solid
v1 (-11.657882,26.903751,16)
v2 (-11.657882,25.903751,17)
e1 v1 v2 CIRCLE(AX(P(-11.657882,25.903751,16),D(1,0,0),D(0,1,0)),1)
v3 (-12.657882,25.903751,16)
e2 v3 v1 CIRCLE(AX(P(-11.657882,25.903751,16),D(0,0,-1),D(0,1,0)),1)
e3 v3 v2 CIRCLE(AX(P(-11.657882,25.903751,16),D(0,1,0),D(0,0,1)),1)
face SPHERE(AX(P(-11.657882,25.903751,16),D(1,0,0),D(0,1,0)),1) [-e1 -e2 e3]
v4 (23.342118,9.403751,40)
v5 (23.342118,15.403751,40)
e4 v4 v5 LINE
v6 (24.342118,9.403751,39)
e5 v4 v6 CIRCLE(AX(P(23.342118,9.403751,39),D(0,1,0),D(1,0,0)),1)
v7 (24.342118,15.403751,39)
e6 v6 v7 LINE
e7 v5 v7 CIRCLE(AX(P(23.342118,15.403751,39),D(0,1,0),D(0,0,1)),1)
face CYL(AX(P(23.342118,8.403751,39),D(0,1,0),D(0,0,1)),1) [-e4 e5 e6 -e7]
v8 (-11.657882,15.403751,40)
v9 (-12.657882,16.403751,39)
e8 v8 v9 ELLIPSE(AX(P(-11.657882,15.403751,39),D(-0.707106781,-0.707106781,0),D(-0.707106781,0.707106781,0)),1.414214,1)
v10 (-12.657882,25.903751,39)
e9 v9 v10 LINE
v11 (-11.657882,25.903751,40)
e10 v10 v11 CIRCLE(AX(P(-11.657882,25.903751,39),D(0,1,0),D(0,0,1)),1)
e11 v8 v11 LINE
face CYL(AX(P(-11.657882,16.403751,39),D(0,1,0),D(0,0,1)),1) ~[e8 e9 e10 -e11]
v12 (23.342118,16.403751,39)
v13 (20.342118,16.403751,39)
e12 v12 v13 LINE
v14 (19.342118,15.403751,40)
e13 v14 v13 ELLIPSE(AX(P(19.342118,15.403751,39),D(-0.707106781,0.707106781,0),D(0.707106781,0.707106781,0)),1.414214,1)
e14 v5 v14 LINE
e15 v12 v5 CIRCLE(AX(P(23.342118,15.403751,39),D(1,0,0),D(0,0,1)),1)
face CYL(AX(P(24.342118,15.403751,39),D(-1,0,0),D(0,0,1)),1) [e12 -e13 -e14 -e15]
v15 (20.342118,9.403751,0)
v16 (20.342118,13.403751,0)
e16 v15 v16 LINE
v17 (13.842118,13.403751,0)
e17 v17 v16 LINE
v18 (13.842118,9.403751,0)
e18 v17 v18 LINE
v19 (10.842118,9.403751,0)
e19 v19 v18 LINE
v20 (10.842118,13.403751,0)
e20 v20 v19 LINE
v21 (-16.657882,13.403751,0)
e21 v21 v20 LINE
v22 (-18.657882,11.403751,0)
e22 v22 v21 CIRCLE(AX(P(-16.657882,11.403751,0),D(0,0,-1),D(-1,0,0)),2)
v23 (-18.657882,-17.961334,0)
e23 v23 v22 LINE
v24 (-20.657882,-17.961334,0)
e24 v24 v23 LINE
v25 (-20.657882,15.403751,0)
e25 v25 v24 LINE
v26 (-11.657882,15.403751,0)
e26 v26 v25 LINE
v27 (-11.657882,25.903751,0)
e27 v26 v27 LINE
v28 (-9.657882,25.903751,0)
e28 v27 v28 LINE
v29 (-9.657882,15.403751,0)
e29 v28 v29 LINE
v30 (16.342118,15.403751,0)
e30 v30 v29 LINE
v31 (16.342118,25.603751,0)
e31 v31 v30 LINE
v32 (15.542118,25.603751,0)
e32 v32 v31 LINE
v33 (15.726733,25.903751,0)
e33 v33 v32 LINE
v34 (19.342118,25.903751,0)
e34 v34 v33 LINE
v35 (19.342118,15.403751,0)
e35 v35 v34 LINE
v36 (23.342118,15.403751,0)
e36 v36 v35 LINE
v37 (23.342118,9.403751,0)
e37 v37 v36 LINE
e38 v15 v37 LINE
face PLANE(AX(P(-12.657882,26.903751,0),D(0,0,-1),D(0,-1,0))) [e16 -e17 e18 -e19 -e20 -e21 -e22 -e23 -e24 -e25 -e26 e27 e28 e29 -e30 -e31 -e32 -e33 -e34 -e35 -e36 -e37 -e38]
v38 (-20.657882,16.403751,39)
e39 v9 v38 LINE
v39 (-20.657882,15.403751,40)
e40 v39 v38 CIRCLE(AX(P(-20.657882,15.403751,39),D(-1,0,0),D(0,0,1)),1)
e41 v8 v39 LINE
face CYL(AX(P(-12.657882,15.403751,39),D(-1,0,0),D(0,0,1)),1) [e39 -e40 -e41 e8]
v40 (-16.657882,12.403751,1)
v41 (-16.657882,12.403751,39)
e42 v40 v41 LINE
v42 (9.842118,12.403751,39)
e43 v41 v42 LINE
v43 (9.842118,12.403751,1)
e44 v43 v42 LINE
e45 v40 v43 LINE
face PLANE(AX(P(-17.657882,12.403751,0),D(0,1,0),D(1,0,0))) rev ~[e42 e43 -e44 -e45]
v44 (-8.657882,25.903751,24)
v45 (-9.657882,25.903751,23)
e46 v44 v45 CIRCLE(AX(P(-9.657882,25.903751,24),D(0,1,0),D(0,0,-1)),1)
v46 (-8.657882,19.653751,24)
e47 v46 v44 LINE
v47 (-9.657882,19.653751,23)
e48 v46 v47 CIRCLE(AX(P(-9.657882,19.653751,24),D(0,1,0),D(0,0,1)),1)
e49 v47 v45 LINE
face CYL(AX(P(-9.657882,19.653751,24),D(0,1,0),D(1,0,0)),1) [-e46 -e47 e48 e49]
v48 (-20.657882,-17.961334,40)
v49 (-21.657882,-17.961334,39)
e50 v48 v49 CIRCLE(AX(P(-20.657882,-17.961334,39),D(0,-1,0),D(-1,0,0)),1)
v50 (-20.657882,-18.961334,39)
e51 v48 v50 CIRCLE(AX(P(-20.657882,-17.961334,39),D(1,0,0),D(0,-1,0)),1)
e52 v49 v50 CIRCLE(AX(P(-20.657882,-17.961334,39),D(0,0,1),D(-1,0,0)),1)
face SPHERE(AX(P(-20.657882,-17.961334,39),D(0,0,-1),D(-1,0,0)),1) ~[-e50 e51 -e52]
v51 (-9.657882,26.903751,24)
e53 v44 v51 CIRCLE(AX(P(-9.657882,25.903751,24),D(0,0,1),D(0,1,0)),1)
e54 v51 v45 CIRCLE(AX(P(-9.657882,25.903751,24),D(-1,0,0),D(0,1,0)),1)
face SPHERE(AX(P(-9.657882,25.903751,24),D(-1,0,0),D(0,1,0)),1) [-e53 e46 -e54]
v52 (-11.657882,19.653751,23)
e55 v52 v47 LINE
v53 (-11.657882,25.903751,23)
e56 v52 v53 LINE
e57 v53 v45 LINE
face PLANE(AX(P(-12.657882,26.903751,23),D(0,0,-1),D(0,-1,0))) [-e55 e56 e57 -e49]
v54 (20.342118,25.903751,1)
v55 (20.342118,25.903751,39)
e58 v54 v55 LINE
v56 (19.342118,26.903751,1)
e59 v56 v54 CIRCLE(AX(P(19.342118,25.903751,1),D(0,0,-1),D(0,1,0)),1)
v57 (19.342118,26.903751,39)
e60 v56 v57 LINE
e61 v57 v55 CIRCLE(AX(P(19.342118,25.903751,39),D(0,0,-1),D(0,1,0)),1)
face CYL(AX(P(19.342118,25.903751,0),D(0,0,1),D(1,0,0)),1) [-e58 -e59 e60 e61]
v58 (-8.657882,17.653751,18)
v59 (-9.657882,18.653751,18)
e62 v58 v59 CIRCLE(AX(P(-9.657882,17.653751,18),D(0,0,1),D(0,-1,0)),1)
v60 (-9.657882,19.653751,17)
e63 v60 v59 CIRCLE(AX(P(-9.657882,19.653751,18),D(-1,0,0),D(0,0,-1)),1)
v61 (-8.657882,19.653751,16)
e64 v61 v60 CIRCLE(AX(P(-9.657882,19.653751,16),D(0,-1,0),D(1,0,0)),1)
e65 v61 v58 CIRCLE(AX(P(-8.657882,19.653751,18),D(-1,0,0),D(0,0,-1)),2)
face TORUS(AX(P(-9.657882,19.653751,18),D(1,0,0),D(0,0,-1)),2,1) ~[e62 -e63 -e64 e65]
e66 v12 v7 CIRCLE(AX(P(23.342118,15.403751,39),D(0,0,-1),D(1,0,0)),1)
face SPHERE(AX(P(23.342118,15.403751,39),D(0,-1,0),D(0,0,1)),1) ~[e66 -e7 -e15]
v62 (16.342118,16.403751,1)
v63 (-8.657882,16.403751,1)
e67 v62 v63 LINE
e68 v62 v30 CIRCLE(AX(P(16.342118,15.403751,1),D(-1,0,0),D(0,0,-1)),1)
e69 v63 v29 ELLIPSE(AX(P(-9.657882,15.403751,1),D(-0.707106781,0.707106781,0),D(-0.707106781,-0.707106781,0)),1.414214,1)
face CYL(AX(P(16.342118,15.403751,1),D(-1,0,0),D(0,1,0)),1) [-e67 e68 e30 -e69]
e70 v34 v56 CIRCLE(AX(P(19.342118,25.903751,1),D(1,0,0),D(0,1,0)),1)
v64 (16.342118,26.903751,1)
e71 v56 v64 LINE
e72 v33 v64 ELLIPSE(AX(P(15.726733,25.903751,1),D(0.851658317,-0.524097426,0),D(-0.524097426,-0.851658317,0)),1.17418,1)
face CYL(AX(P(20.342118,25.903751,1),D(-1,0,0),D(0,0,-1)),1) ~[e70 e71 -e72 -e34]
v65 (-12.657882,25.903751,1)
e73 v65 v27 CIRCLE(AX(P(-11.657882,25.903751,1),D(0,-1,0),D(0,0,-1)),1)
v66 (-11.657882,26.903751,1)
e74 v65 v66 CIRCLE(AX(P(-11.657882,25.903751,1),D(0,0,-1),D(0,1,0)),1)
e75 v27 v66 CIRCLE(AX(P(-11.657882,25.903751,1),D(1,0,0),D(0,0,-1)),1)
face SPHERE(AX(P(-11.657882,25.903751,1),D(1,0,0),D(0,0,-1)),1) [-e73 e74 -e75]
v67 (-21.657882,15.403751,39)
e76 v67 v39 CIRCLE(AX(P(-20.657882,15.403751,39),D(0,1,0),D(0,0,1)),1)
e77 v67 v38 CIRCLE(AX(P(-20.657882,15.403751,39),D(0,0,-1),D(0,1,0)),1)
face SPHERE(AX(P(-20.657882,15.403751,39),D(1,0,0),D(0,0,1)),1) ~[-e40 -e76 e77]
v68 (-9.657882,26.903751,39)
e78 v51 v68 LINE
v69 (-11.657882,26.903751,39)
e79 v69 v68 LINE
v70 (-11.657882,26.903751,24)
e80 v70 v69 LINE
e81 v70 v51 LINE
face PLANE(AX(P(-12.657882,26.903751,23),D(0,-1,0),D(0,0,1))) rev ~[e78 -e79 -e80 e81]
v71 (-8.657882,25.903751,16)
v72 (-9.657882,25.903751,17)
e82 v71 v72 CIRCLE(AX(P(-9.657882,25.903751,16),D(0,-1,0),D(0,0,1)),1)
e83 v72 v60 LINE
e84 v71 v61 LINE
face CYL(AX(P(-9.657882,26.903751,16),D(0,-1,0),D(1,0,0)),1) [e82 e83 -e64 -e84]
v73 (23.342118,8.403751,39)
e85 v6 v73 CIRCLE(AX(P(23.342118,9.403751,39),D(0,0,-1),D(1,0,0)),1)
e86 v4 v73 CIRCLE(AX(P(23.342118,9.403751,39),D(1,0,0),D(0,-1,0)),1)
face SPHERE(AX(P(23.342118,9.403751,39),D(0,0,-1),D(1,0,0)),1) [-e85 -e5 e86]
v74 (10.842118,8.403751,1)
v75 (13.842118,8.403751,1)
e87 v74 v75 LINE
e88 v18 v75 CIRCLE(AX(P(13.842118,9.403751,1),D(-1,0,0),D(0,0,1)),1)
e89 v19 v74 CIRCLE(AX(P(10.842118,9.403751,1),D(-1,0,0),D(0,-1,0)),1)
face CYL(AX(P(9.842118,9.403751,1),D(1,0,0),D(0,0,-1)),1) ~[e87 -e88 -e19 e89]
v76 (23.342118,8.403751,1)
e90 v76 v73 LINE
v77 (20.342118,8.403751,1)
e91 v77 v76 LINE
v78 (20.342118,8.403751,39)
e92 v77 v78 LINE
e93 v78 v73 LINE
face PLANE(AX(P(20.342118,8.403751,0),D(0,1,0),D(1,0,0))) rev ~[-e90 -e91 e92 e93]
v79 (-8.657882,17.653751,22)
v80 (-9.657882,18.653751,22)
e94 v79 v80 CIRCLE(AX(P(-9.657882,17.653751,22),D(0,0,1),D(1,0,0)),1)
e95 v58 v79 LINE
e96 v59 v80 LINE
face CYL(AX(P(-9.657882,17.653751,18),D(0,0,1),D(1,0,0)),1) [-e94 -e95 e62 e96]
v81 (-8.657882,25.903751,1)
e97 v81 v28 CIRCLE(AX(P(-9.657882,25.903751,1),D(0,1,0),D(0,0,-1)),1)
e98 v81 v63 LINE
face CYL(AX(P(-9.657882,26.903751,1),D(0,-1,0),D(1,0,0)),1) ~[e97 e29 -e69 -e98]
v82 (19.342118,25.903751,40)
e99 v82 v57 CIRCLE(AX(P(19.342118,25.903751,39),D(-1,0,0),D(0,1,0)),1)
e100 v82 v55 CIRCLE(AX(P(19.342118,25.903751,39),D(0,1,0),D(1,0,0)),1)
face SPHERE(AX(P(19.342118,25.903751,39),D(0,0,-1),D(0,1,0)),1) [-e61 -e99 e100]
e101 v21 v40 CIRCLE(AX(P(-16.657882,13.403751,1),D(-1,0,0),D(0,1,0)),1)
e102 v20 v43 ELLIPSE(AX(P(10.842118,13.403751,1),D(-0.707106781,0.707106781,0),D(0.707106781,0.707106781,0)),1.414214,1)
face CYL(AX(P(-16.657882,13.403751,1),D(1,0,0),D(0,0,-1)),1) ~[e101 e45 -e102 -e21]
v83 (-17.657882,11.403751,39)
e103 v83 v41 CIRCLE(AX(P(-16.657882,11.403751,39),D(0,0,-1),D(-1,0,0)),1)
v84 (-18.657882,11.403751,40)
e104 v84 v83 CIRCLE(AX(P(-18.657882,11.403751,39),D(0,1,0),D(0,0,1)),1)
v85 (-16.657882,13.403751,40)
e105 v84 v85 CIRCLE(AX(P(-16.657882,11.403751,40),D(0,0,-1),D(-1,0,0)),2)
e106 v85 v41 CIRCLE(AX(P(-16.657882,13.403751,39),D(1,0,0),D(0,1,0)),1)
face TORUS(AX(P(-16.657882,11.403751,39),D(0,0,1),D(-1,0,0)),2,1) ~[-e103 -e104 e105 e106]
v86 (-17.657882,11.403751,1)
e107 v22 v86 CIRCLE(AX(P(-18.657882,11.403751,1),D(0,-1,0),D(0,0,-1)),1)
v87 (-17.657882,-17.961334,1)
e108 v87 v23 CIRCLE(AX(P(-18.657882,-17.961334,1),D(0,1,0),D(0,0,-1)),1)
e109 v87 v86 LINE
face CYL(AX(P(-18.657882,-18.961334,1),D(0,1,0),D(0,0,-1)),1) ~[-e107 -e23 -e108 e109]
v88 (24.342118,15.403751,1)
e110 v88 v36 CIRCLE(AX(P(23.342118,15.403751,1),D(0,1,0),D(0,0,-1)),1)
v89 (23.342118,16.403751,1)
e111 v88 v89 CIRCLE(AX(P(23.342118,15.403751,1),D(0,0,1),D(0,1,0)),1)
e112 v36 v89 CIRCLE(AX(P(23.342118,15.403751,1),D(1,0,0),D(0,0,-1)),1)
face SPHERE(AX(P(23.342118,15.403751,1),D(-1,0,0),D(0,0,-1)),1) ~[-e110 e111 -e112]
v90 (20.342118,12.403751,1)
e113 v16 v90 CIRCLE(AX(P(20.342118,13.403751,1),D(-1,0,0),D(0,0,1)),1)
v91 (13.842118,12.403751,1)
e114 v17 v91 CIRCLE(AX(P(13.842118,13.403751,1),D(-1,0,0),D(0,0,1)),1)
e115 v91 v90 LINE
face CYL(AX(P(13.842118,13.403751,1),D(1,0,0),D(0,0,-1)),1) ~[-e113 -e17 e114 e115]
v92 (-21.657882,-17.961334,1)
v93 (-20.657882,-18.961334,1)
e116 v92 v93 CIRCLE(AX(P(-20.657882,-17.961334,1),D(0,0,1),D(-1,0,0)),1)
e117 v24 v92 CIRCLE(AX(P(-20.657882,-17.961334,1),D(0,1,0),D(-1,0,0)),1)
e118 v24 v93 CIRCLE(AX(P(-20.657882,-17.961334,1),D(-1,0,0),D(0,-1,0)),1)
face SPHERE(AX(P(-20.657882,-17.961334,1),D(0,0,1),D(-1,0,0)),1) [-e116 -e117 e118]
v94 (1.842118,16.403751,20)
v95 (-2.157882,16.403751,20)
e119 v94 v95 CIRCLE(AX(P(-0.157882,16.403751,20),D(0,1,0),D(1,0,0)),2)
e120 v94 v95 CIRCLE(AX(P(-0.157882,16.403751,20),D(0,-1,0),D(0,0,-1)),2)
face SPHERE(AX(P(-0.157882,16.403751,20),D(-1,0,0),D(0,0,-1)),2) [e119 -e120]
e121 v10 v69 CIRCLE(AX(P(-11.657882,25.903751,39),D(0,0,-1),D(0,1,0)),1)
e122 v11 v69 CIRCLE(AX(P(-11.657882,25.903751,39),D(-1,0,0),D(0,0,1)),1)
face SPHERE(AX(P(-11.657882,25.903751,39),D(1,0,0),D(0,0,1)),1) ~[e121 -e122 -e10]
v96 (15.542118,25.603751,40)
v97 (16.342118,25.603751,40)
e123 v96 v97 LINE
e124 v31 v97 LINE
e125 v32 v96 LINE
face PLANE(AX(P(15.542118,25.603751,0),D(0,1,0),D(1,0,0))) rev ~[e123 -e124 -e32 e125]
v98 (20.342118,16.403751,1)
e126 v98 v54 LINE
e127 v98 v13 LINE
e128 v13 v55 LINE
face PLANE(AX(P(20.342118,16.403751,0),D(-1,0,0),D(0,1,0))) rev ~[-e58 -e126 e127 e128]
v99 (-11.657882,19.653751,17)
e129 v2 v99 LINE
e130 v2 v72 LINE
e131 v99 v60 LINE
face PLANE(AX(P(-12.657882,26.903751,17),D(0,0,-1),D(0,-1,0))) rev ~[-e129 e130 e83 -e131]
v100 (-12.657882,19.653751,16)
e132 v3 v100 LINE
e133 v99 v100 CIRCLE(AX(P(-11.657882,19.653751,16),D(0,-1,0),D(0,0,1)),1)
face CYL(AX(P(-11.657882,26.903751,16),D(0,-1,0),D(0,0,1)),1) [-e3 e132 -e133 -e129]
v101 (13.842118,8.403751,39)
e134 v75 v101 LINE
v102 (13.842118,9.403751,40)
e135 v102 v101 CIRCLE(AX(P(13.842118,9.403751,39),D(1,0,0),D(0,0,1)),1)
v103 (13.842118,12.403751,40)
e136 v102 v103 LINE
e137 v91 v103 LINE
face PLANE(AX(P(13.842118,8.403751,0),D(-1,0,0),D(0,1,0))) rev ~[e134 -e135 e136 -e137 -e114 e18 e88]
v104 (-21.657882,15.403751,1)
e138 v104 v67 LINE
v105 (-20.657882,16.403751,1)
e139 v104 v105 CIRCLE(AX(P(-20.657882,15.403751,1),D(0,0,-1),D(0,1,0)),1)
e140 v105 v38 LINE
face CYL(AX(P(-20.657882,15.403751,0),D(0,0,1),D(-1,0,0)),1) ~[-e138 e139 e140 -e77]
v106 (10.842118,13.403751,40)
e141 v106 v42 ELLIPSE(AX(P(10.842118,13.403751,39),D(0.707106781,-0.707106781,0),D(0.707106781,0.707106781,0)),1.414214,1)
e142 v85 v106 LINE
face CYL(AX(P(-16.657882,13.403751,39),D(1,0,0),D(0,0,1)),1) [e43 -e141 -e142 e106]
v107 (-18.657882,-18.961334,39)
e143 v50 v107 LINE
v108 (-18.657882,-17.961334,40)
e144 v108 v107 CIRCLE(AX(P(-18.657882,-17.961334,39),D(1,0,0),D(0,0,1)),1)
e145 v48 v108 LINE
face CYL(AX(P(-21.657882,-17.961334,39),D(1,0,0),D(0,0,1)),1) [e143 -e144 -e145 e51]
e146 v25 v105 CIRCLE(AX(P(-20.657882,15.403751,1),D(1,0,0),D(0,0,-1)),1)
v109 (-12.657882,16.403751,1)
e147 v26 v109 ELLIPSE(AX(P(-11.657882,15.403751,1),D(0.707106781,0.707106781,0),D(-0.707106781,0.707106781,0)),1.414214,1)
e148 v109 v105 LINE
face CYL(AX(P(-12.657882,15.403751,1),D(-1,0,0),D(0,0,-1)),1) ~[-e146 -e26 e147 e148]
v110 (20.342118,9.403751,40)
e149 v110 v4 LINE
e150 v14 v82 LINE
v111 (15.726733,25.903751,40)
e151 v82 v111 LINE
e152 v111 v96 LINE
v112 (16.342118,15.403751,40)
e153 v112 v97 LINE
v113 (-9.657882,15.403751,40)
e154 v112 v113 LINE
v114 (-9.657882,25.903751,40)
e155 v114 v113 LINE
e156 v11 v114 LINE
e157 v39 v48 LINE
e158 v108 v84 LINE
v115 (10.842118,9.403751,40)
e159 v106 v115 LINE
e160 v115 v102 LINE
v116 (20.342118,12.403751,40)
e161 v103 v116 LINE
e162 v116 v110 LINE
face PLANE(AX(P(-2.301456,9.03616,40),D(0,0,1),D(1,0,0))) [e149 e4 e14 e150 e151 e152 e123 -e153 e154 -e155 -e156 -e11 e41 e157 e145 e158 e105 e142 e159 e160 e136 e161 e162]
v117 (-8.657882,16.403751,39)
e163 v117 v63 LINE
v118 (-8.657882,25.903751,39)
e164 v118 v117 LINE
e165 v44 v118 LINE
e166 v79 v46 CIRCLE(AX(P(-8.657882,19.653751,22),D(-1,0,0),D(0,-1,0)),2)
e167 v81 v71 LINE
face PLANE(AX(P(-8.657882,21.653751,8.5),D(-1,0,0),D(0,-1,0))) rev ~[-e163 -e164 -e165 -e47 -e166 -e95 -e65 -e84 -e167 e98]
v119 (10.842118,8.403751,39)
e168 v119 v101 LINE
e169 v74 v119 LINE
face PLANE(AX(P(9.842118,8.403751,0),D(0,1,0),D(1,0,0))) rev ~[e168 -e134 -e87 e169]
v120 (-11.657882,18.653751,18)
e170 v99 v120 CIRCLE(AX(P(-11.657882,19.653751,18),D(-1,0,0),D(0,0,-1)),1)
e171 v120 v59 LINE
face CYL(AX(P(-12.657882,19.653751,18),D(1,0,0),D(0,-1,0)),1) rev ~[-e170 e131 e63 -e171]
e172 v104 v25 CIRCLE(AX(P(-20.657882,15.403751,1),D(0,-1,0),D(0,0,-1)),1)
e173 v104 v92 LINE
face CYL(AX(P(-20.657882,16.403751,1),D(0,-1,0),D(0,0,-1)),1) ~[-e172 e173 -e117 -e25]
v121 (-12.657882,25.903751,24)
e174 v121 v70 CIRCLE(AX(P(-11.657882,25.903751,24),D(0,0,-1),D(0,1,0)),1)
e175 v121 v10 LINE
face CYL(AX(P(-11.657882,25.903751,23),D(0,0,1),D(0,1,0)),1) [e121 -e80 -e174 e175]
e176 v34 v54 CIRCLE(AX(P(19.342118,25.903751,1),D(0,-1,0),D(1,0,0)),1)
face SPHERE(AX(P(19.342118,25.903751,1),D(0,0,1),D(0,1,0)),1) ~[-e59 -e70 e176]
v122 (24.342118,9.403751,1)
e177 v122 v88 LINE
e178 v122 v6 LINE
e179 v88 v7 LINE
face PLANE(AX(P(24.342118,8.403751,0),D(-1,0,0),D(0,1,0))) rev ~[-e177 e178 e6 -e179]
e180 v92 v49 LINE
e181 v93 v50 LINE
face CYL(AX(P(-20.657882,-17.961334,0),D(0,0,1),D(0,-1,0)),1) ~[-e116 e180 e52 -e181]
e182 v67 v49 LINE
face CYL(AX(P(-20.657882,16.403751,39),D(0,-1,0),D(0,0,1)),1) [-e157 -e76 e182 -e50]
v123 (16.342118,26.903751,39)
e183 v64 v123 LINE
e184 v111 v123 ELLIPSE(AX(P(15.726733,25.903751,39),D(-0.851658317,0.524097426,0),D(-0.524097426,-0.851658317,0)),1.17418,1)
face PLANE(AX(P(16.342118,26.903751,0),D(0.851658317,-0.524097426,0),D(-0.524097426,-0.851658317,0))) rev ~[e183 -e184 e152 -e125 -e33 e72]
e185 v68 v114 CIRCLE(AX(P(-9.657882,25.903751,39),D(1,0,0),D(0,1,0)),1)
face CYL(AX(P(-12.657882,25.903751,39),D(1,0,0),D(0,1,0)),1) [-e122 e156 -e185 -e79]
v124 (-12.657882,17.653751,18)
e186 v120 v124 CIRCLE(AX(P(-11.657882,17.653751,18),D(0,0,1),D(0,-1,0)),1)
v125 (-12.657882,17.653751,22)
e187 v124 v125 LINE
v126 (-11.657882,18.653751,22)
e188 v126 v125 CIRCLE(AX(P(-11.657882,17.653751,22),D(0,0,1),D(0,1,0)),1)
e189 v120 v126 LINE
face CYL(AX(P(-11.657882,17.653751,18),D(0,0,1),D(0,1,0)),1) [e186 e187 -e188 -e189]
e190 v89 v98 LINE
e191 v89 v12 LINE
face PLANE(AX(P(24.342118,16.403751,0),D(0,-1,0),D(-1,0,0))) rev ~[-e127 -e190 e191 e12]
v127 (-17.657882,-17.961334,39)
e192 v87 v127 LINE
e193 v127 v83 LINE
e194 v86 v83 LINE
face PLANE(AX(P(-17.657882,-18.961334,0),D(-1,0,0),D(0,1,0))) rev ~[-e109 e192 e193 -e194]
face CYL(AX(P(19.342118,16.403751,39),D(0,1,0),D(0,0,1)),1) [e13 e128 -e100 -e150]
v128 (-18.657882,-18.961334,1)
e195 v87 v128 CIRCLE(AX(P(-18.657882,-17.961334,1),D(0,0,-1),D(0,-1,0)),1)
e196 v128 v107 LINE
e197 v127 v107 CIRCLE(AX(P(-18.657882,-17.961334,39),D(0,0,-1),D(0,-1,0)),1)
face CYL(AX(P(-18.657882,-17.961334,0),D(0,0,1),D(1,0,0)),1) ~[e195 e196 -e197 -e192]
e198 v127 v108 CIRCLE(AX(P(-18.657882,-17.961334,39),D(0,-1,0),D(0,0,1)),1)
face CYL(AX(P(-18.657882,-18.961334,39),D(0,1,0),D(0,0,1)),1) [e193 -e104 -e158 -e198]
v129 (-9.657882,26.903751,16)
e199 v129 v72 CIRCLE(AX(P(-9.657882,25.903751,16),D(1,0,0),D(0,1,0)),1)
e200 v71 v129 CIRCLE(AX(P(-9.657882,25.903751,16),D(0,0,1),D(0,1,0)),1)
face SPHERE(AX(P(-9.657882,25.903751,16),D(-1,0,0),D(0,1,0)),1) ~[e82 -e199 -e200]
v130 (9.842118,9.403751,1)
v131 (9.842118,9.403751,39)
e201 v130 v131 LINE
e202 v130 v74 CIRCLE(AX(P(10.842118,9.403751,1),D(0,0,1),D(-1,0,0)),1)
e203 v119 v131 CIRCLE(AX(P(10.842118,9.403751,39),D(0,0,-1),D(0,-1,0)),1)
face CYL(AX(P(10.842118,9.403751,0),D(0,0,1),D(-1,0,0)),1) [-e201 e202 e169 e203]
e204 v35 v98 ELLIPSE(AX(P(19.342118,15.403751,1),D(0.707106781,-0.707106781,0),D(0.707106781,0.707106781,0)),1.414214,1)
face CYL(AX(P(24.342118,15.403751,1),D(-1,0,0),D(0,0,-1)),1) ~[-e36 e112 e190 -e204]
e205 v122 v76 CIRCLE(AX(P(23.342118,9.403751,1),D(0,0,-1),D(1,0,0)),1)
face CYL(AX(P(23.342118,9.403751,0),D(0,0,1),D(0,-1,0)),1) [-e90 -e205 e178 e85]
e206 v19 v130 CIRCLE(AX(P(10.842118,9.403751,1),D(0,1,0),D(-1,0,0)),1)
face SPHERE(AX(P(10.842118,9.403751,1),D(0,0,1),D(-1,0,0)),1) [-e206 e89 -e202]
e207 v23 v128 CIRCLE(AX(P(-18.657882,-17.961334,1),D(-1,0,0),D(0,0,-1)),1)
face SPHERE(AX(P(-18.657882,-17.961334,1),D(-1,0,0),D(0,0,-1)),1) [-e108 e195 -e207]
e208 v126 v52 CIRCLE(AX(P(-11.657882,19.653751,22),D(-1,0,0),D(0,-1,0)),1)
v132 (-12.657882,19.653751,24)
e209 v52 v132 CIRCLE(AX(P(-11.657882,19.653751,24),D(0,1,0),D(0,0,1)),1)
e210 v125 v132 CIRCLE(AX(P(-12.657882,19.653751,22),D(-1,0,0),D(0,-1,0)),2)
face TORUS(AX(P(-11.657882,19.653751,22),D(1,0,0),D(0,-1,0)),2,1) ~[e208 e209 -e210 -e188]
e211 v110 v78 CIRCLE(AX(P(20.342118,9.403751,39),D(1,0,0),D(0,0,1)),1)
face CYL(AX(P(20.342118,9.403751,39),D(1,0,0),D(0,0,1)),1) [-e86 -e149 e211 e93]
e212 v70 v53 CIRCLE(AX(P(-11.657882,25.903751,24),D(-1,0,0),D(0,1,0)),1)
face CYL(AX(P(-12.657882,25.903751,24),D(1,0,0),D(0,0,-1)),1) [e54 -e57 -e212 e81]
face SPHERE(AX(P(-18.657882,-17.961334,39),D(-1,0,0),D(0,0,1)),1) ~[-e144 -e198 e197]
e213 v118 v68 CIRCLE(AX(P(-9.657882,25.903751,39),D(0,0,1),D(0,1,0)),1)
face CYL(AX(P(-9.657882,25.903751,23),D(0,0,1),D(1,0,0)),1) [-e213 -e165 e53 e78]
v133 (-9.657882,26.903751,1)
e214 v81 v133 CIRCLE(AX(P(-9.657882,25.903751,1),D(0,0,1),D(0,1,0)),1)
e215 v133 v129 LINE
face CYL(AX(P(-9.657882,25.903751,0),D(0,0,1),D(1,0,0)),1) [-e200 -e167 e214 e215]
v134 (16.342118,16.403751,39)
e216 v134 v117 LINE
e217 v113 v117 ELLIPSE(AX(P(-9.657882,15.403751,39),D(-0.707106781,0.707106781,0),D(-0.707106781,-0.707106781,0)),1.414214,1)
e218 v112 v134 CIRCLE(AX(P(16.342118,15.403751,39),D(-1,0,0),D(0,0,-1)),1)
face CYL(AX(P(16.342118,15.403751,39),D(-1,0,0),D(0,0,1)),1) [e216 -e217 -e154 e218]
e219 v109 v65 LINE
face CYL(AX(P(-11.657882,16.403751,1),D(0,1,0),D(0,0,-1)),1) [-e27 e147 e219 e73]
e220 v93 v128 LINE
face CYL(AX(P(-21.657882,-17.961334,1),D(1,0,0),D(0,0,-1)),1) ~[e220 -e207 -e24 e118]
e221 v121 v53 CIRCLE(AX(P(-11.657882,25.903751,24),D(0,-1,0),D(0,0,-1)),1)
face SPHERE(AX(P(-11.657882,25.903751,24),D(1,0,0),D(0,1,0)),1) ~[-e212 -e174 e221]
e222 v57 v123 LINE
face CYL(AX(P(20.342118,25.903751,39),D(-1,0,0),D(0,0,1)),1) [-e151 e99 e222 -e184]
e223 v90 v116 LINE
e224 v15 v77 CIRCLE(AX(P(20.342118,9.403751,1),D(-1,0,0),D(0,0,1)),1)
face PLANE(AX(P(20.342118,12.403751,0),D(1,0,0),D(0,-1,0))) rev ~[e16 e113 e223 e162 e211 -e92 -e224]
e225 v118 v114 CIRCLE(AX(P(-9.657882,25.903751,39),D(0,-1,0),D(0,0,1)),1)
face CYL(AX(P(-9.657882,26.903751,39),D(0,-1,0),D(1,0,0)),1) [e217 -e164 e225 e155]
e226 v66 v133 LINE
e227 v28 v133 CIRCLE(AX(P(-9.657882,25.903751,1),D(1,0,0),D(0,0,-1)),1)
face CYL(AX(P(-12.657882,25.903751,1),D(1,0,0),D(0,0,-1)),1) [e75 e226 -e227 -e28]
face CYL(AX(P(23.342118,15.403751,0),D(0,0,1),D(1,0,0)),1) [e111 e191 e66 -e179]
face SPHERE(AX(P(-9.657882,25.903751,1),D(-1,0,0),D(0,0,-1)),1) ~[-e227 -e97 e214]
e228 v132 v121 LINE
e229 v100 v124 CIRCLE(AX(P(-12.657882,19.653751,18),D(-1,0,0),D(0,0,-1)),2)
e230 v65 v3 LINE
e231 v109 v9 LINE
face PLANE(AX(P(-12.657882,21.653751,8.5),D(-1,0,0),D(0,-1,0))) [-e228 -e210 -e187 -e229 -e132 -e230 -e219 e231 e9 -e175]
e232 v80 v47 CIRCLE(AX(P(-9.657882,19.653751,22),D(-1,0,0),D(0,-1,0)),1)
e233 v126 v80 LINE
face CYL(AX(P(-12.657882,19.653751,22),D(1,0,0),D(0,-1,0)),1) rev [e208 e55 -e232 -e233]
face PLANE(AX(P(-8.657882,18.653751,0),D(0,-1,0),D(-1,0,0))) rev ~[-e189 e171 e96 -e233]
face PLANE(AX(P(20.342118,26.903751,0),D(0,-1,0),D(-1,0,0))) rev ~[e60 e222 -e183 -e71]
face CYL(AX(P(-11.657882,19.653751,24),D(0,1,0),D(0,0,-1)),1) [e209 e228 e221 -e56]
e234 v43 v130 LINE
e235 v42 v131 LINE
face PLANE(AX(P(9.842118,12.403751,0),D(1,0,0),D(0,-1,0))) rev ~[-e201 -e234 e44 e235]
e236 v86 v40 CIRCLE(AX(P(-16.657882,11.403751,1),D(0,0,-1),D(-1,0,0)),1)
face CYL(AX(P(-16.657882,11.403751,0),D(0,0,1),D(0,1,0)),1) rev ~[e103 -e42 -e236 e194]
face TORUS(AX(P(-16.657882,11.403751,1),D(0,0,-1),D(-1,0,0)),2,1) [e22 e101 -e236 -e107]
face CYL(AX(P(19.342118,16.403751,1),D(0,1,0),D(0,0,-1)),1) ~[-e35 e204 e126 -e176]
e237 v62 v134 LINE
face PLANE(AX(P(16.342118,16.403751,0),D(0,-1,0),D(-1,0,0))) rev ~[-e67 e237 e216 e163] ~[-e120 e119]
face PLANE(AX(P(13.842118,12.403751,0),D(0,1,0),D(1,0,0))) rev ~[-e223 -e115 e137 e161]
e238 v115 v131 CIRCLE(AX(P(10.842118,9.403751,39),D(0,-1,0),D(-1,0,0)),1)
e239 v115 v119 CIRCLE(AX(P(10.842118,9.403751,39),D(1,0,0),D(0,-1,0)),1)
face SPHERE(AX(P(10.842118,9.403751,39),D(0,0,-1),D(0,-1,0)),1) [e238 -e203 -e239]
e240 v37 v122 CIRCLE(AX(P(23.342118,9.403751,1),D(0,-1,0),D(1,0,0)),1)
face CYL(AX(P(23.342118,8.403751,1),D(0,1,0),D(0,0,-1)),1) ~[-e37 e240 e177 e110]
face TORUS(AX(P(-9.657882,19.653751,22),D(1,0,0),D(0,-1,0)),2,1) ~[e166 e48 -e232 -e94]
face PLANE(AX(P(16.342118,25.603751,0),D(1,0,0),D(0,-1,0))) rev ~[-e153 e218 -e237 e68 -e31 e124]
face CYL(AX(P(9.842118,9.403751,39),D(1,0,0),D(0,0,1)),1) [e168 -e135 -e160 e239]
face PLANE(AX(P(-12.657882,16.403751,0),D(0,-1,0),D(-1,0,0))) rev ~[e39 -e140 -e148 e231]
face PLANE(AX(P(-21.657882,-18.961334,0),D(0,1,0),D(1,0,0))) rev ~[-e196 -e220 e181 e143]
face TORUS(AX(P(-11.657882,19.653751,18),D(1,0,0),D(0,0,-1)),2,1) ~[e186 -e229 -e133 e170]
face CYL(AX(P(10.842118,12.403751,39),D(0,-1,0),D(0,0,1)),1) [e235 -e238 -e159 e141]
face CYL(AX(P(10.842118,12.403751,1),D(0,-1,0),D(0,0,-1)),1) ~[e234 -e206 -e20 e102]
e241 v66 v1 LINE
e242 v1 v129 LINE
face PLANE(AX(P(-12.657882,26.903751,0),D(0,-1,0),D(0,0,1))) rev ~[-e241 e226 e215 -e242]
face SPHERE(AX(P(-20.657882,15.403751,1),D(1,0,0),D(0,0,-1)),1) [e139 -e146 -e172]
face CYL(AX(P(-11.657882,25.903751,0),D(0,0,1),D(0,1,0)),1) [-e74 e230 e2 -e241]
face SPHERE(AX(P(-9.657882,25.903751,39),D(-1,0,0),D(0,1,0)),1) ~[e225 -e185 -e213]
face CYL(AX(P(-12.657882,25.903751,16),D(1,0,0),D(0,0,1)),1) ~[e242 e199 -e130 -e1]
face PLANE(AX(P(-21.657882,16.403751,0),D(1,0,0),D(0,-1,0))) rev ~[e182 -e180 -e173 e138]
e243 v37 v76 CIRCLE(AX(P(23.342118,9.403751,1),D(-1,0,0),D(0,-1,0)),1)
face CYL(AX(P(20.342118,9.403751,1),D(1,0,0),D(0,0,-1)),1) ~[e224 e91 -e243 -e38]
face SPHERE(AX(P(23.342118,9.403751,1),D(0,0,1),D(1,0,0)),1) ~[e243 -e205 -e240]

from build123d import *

# Parameters (mm, degrees)
F1_DEPTH = 40
F2_W     = 10.5
F2_H     = 17
F3_DEPTH = 4
F4_F1_R  = 1
F4_F2_R  = 1


with BuildPart() as f1:
    # F0 (on Top) → F1 (new body)
    with BuildSketch(Plane.XY):
        Polygon((-12.6578821212, 16.4037507206), (-21.6578821212, 16.4037507206), (-21.6578821212, -18.9613338028), (-17.6578821212, -18.9613338028), (-17.6578821212, 12.4037507206), (9.8421178788, 12.4037507206), (9.8421178788, 8.4037507206), (13.8421178788, 8.4037507206), (13.8421178788, 12.4037507206), (20.3421178788, 12.4037507206), (20.3421178788, 8.4037507206), (24.3421178788, 8.4037507206), (24.3421178788, 16.4037507206), (20.3421178788, 16.4037507206), (20.3421178788, 26.9037507206), (16.3421178788, 26.9037507206), (15.5421178788, 25.6037507206), (16.3421178788, 25.6037507206), (16.3421178788, 16.4037507206), (-8.6578821212, 16.4037507206), (-8.6578821212, 18.6537507206), (-12.6578821212, 18.6537507206), align=None)
    extrude(amount=F1_DEPTH)

    # F2 (on face) → F3 (join, through all)
    with BuildSketch(Plane(origin=(-12.6578821212, 0, 0), x_dir=(0, -1, 0), z_dir=(-1, 0, 0))):
        with Locations((-21.6537507206, 8.5)):
            Rectangle(F2_W, F2_H)
        with Locations((-21.6537507206, 31.5)):
            Rectangle(F2_W, F2_H)
    extrude(amount=-F3_DEPTH)

    # F4: fillet of radius 1 on 53 edges, made by hand

    # F4_f1
    f4_f1_edges = [f1.edges().sort_by_distance(p)[0] for p in [
        (-10.6578821212, 18.6537507206, 17),
        (-10.6578821212, 18.6537507206, 23),
        (-17.6578821212, 12.4037507206, 20),
    ]]
    fillet(f4_f1_edges, radius=F4_F1_R)

    # F4_f2
    f4_f2_edges = [f1.edges().sort_by_distance(p)[0] for p in [
        (20.3421178788, 26.9037507206, 20),
        (-10.6578821212, 26.9037507206, 17),
        (-10.6578821212, 26.9037507206, 23),
        (-10.6578821212, 26.9037507206, 0),
        (-10.6578821212, 26.9037507206, 40),
        (24.3421178788, 8.4037507206, 20),
        (9.8421178788, 8.4037507206, 20),
        (-21.6578821212, -18.9613338028, 20),
        (-12.6578821212, 21.6537507206, 40),
        (-12.6578821212, 21.6537507206, 0),
        (-12.6578821212, 26.9037507206, 8.5),
        (-12.6578821212, 26.9037507206, 31.5),
        (-17.1578821212, 16.4037507206, 0),
        (-17.1578821212, 16.4037507206, 40),
        (-21.6578821212, -1.2787915411, 40),
        (-21.6578821212, -1.2787915411, 0),
        (-19.6578821212, -18.9613338028, 40),
        (-19.6578821212, -18.9613338028, 0),
        (18.3421178788, 26.9037507206, 0),
        (18.3421178788, 26.9037507206, 40),
        (20.3421178788, 21.6537507206, 0),
        (20.3421178788, 21.6537507206, 40),
        (3.8421178788, 16.4037507206, 0),
        (3.8421178788, 16.4037507206, 40),
        (-3.4078821212, 12.4037507206, 0),
        (-3.4078821212, 12.4037507206, 40),
        (-17.6578821212, -18.9613338028, 20),
        (-8.6578821212, 21.6537507206, 0),
        (-8.6578821212, 26.9037507206, 8.5),
        (-8.6578821212, 26.9037507206, 31.5),
        (-8.6578821212, 21.6537507206, 40),
        (-12.6578821212, 23.2787507206, 17),
        (-8.6578821212, 23.2787507206, 17),
        (-8.6578821212, 18.6537507206, 20),
        (-12.6578821212, 18.6537507206, 20),
        (-12.6578821212, 23.2787507206, 23),
        (-8.6578821212, 23.2787507206, 23),
        (22.3421178788, 16.4037507206, 0),
        (24.3421178788, 12.4037507206, 0),
        (22.3421178788, 8.4037507206, 0),
        (9.8421178788, 10.4037507206, 0),
        (11.8421178788, 8.4037507206, 0),
        (17.0921178788, 12.4037507206, 0),
        (24.3421178788, 12.4037507206, 40),
        (22.3421178788, 8.4037507206, 40),
        (11.8421178788, 8.4037507206, 40),
        (9.8421178788, 10.4037507206, 40),
        (22.3421178788, 16.4037507206, 40),
        (24.3421178788, 16.4037507206, 20),
        (-21.6578821212, 16.4037507206, 20),
        (-8.6578821212, 18.9466439394, 22.7071067812),
        (-12.6578821212, 18.9466439394, 22.7071067812),
        (-12.6578821212, 18.9466439394, 17.2928932188),
        (-8.6578821212, 18.9466439394, 17.2928932188),
        (-17.3649889024, 12.1108575018, 40),
        (-17.3649889024, 12.1108575018, 0),
    ]]
    fillet(f4_f2_edges, radius=F4_F2_R)

    # F5 (on face) → F6 (revolve)
    with BuildSketch(Plane(origin=(0, 16.4037507206, 0), x_dir=(-1, 0, 0), z_dir=(0, 1, 0))):
        with BuildLine():
            Line((2.1578821212, 20), (-1.8421178788, 20))
            ThreePointArc((-1.8421178788, 20), (0.1578821212, 18), (2.1578821212, 20))
        make_face()
    revolve(axis=Axis((-0.1578821212, 16.4037507206, 20), (-1, 0, 0)))


solid = f1.part
